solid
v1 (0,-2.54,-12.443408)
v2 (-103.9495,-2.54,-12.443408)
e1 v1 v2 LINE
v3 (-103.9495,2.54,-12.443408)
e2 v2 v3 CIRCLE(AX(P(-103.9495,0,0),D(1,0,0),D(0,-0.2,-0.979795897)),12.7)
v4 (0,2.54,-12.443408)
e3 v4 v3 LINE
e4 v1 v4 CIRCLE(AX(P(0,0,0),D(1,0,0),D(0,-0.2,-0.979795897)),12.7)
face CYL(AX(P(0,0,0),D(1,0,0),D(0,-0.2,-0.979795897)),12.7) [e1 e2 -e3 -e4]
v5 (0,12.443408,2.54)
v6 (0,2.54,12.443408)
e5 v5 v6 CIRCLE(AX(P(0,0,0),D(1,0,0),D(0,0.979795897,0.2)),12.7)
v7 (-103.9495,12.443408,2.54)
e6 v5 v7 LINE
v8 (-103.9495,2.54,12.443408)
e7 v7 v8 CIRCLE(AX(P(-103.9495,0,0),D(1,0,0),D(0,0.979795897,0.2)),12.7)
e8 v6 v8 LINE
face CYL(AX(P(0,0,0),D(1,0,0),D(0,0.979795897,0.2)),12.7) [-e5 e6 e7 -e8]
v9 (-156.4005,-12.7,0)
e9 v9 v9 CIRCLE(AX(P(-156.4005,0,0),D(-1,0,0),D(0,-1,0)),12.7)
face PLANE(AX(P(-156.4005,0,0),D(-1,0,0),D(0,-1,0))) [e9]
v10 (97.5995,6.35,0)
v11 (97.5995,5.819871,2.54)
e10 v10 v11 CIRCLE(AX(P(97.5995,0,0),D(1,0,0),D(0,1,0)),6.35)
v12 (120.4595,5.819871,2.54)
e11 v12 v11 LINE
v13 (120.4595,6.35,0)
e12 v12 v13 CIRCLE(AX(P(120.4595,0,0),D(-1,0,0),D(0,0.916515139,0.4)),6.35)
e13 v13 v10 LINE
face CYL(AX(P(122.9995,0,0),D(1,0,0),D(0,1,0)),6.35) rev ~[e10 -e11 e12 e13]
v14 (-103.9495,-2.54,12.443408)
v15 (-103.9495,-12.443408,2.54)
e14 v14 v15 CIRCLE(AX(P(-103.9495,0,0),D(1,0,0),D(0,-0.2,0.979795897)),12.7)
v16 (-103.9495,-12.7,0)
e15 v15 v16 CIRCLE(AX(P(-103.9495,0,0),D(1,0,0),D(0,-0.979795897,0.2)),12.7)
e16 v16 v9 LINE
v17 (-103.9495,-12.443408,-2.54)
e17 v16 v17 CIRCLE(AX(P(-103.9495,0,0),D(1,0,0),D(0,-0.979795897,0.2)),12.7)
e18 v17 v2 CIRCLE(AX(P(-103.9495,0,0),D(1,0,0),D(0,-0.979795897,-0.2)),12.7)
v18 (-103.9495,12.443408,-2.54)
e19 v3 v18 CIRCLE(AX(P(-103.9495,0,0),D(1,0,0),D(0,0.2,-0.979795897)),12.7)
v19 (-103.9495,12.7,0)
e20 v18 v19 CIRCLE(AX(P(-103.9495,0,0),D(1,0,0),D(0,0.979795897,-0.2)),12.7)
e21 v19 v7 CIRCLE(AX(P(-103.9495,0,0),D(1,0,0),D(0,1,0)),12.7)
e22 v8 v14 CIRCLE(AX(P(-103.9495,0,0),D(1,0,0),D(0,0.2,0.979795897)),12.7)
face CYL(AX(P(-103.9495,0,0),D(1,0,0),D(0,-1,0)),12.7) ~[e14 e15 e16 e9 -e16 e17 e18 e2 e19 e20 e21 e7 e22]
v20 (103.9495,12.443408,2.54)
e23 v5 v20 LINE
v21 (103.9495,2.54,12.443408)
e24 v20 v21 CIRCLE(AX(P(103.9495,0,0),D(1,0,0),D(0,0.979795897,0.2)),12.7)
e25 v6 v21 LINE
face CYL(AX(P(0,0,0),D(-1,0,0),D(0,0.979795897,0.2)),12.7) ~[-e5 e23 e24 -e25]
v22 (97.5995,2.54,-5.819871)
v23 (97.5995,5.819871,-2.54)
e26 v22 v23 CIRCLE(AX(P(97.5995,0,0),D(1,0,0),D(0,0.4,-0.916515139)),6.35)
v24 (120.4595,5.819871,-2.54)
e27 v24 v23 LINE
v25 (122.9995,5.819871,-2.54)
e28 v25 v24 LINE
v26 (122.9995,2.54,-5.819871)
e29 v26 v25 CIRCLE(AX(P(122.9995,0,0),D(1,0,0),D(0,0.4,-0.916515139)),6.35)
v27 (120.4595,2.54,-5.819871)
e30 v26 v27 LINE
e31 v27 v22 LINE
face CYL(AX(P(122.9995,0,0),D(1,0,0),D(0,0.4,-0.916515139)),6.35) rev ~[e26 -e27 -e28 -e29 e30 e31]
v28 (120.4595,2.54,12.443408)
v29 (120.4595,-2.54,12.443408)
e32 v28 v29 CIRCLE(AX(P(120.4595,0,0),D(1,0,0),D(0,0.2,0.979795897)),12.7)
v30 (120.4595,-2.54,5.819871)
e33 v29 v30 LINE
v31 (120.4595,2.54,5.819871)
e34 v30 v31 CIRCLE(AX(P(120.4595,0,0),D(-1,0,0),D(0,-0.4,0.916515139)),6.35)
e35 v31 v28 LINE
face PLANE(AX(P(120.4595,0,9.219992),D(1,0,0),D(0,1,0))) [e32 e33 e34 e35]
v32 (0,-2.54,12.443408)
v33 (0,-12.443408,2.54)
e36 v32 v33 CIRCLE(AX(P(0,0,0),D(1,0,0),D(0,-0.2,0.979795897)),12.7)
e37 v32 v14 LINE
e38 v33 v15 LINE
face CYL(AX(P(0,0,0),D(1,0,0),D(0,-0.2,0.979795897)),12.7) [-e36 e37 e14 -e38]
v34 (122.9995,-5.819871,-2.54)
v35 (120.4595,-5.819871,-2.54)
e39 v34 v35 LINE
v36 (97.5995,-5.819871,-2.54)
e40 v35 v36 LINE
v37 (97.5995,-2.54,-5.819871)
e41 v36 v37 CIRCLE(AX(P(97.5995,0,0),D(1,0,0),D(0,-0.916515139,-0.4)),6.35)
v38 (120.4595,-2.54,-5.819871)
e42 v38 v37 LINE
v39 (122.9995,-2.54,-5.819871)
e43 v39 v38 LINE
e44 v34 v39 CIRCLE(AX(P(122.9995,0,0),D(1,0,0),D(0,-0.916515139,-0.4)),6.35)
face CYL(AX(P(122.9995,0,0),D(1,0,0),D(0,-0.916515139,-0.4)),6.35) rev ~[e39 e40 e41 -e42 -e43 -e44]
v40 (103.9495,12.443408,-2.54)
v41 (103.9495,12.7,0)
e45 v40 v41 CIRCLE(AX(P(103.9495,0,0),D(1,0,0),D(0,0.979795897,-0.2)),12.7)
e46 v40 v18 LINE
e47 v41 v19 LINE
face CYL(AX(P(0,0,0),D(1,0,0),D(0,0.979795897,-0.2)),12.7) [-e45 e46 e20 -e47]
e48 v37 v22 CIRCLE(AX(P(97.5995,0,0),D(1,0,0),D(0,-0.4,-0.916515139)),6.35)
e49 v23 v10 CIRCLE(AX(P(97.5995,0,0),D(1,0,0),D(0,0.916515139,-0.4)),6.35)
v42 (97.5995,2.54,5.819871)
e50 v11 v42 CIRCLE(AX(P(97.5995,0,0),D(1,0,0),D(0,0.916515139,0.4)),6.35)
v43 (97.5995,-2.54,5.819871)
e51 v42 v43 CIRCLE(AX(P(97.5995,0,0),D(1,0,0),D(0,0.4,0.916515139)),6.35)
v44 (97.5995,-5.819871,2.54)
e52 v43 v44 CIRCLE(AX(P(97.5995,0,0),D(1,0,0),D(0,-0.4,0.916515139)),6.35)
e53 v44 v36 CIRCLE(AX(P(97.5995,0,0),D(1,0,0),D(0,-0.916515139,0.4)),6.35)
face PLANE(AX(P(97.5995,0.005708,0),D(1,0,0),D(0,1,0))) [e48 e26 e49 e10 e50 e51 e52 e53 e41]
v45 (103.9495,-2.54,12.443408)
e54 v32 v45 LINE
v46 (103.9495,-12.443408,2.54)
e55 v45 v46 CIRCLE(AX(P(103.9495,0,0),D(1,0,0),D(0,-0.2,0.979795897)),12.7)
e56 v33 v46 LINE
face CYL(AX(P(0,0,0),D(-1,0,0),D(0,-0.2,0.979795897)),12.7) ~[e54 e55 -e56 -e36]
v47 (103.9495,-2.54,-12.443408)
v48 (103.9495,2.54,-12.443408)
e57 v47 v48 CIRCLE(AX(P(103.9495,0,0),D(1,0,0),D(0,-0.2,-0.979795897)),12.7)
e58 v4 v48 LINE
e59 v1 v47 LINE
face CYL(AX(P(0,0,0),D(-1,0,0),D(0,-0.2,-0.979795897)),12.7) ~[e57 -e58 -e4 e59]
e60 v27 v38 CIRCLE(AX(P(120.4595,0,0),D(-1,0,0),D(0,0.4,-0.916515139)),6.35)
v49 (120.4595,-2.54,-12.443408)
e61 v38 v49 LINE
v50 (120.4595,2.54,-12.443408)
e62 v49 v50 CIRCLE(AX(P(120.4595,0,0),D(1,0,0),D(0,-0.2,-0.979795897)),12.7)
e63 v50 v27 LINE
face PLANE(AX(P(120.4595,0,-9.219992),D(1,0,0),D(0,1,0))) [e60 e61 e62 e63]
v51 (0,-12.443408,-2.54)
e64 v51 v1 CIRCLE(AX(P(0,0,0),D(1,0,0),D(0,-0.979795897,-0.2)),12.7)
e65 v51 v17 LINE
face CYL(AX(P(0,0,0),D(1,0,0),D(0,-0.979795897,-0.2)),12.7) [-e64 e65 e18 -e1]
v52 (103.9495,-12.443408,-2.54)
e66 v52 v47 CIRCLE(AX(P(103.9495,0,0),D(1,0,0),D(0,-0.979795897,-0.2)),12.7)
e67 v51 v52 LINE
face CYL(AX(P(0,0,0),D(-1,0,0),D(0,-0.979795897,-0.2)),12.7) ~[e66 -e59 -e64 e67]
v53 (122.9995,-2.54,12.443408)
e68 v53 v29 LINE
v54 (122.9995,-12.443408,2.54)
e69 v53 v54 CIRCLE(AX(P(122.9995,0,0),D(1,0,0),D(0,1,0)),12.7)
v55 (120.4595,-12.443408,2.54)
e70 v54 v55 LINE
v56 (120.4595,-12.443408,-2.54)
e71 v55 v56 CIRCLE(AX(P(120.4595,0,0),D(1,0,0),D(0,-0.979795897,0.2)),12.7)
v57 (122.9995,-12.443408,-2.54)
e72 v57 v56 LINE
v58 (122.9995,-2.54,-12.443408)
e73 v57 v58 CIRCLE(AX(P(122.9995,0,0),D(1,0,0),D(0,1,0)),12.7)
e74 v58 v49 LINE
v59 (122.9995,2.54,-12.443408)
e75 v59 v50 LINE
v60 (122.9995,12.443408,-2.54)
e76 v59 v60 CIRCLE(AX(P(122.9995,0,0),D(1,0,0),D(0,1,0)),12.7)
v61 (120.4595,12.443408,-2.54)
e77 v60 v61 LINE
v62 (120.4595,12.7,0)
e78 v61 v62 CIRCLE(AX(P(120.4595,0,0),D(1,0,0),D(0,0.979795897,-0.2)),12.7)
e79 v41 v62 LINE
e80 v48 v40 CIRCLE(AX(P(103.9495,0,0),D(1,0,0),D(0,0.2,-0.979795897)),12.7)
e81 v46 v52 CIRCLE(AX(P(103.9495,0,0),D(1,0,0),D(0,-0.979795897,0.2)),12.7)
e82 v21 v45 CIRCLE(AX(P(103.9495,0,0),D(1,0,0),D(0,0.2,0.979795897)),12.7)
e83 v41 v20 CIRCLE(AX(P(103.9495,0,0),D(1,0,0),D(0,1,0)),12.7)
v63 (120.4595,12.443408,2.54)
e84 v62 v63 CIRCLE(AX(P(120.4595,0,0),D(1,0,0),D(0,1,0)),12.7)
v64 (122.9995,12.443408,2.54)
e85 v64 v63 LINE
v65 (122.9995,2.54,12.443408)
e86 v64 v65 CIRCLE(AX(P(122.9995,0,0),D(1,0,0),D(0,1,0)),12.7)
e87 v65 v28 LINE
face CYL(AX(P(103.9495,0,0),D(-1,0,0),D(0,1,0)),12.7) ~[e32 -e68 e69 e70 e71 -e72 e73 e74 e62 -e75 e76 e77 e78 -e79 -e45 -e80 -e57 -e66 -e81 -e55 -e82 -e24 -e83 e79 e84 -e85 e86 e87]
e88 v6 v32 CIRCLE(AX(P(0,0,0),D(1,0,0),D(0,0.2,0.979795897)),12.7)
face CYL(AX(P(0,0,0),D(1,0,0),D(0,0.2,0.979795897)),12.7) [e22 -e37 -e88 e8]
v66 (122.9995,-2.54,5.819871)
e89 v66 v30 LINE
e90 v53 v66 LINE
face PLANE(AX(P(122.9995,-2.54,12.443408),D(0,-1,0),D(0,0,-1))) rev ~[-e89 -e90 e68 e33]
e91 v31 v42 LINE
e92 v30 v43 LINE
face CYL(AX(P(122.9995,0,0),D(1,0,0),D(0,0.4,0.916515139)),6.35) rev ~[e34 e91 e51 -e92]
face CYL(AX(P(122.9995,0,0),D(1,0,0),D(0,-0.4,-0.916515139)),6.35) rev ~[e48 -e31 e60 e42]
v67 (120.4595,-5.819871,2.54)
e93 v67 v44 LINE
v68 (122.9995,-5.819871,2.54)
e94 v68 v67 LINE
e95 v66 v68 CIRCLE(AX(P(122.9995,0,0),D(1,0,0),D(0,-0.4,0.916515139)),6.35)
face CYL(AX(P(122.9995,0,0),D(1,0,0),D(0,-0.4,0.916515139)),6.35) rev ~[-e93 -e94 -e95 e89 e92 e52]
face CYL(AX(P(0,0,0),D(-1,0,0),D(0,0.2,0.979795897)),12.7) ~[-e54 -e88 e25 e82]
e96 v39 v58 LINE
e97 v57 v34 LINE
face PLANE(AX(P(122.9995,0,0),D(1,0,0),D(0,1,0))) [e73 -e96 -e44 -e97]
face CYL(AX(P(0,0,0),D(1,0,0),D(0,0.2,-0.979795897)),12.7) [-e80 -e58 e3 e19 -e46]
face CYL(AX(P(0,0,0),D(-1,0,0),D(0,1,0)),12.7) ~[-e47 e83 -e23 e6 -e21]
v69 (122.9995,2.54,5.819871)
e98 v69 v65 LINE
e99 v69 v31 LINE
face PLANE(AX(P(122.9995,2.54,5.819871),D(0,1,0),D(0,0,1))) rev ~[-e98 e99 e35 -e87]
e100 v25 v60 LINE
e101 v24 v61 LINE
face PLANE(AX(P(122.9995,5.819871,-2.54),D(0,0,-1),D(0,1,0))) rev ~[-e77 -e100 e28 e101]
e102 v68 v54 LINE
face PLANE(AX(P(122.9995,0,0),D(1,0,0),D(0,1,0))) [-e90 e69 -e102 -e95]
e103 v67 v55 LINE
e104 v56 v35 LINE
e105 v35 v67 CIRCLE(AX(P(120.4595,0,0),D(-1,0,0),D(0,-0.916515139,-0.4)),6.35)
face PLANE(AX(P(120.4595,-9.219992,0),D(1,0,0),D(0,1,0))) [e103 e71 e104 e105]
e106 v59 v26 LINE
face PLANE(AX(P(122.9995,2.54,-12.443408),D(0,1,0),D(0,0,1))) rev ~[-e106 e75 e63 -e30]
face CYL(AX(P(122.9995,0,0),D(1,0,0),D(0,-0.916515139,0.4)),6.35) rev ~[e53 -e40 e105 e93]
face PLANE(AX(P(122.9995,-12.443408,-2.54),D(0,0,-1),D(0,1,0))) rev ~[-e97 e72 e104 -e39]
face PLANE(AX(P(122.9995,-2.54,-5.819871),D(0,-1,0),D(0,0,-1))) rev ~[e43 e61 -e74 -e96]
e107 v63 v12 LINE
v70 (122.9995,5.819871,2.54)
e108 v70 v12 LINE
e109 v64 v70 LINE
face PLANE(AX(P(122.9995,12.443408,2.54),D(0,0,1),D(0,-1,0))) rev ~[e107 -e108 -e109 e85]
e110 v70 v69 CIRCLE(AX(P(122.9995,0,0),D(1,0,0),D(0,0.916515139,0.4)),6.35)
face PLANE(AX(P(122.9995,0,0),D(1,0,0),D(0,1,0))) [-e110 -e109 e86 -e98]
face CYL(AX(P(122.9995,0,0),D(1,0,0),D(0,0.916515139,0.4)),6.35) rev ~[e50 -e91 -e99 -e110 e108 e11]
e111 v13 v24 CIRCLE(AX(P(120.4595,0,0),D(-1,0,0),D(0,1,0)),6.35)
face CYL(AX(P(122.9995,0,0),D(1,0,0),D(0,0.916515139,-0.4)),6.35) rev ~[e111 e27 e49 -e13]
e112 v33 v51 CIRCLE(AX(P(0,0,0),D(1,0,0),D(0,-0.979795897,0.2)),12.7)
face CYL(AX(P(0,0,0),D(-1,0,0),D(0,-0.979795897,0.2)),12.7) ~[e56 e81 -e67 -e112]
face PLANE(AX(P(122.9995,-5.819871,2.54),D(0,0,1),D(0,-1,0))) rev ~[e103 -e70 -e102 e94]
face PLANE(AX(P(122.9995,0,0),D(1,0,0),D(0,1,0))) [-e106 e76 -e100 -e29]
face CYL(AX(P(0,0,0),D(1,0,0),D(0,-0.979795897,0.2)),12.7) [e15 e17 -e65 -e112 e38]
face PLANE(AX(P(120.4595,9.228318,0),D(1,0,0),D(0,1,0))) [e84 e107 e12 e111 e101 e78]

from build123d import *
from build123d import SkipClean  # not in build123d's __all__

# Parameters (mm, degrees)
F1_DEPTH  = 103.9495
F3_R      = 12.7
F4_DEPTH  = 19.05
F6_DEPTH  = 25.4
F8_DEPTH  = 2.54
F9_R      = 12.7
F10_DEPTH = 52.451


# Not quite as in the source:
# - after a boolean that leaves OpenCascade's solid faulty, fix() repairs it


with BuildPart() as f1:
    # F0 (on Right) → F1 (new body, symmetric)
    with BuildSketch(Plane.YZ):
        with BuildLine():
            ThreePointArc((12.4434078933, -2.54), (12.6356891432, -1.2764638175), (12.7, 0))
            ThreePointArc((12.7, 0), (12.6356891432, 1.2764638175), (12.4434078933, 2.54))
            Line((12.4434078933, 2.54), (5.8198711326, 2.54))
            ThreePointArc((5.8198711326, 2.54), (6.2160550871, 1.2973662374), (6.35, 0))
            ThreePointArc((6.35, 0), (6.2160550871, -1.2973662374), (5.8198711326, -2.54))
            Line((5.8198711326, -2.54), (12.4434078933, -2.54))
        make_face()
        with BuildLine():
            Line((5.8198711326, 2.54), (12.4434078933, 2.54))
            ThreePointArc((12.4434078933, 2.54), (8.9802561211, 8.9802561211), (2.54, 12.4434078933))
            Line((2.54, 12.4434078933), (2.54, 5.8198711326))
            ThreePointArc((2.54, 5.8198711326), (4.4901280605, 4.4901280605), (5.8198711326, 2.54))
        make_face()
        with BuildLine():
            ThreePointArc((2.54, -12.4434078933), (8.9802561211, -8.9802561211), (12.4434078933, -2.54))
            Line((12.4434078933, -2.54), (5.8198711326, -2.54))
            ThreePointArc((5.8198711326, -2.54), (4.4901280605, -4.4901280605), (2.54, -5.8198711326))
            Line((2.54, -5.8198711326), (2.54, -12.4434078933))
        make_face()
        with BuildLine():
            Line((2.54, 5.8198711326), (2.54, 12.4434078933))
            ThreePointArc((2.54, 12.4434078933), (0, 12.7), (-2.54, 12.4434078933))
            Line((-2.54, 12.4434078933), (-2.54, 5.8198711326))
            ThreePointArc((-2.54, 5.8198711326), (0, 6.35), (2.54, 5.8198711326))
        make_face()
        with BuildLine():
            ThreePointArc((-2.54, -12.4434078933), (0, -12.7), (2.54, -12.4434078933))
            Line((2.54, -12.4434078933), (2.54, -5.8198711326))
            ThreePointArc((2.54, -5.8198711326), (0, -6.35), (-2.54, -5.8198711326))
            Line((-2.54, -5.8198711326), (-2.54, -12.4434078933))
        make_face()
        with BuildLine():
            Line((-2.54, 5.8198711326), (-2.54, 12.4434078933))
            ThreePointArc((-2.54, 12.4434078933), (-8.9802561211, 8.9802561211), (-12.4434078933, 2.54))
            Line((-12.4434078933, 2.54), (-5.8198711326, 2.54))
            ThreePointArc((-5.8198711326, 2.54), (-4.4901280605, 4.4901280605), (-2.54, 5.8198711326))
        make_face()
        with BuildLine():
            ThreePointArc((-12.4434078933, -2.54), (-8.9802561211, -8.9802561211), (-2.54, -12.4434078933))
            Line((-2.54, -12.4434078933), (-2.54, -5.8198711326))
            ThreePointArc((-2.54, -5.8198711326), (-4.4901280605, -4.4901280605), (-5.8198711326, -2.54))
            Line((-5.8198711326, -2.54), (-12.4434078933, -2.54))
        make_face()
        with BuildLine():
            Line((-5.8198711326, 2.54), (-12.4434078933, 2.54))
            ThreePointArc((-12.4434078933, 2.54), (-12.7, 0), (-12.4434078933, -2.54))
            Line((-12.4434078933, -2.54), (-5.8198711326, -2.54))
            ThreePointArc((-5.8198711326, -2.54), (-6.35, 0), (-5.8198711326, 2.54))
        make_face()
        with BuildLine():
            ThreePointArc((6.35, 0), (6.2160550871, 1.2973662374), (5.8198711326, 2.54))
            ThreePointArc((5.8198711326, 2.54), (4.4901280605, 4.4901280605), (2.54, 5.8198711326))
            ThreePointArc((2.54, 5.8198711326), (0, 6.35), (-2.54, 5.8198711326))
            ThreePointArc((-2.54, 5.8198711326), (-4.4901280605, 4.4901280605), (-5.8198711326, 2.54))
            ThreePointArc((-5.8198711326, 2.54), (-6.35, 0), (-5.8198711326, -2.54))
            ThreePointArc((-5.8198711326, -2.54), (-4.4901280605, -4.4901280605), (-2.54, -5.8198711326))
            ThreePointArc((-2.54, -5.8198711326), (0, -6.35), (2.54, -5.8198711326))
            ThreePointArc((2.54, -5.8198711326), (4.4901280605, -4.4901280605), (5.8198711326, -2.54))
            ThreePointArc((5.8198711326, -2.54), (6.2160550871, -1.2973662374), (6.35, 0))
        make_face()
    extrude(amount=F1_DEPTH, both=True)

    # F3 (on face) → F4 (join)
    with BuildSketch(Plane.YZ.offset(103.9495)):
        Circle(F3_R)
    with SkipClean():  # cleaning this boolean's faces spoils the solid; the shape is the same uncleaned
        extrude(amount=F4_DEPTH)

    # F5 (on face) → F6 (cut)
    with BuildSketch(Plane.YZ.offset(122.9995)):
        with BuildLine():
            ThreePointArc((5.8198711326, -2.54), (6.2160550871, -1.2973662374), (6.35, 0))
            ThreePointArc((6.35, 0), (6.2160550871, 1.2973662374), (5.8198711326, 2.54))
            ThreePointArc((5.8198711326, 2.54), (4.4901280605, 4.4901280605), (2.54, 5.8198711326))
            ThreePointArc((2.54, 5.8198711326), (0, 6.35), (-2.54, 5.8198711326))
            ThreePointArc((-2.54, 5.8198711326), (-4.4901280605, 4.4901280605), (-5.8198711326, 2.54))
            ThreePointArc((-5.8198711326, 2.54), (-6.35, 0), (-5.8198711326, -2.54))
            ThreePointArc((-5.8198711326, -2.54), (-4.4901280605, -4.4901280605), (-2.54, -5.8198711326))
            ThreePointArc((-2.54, -5.8198711326), (0, -6.35), (2.54, -5.8198711326))
            ThreePointArc((2.54, -5.8198711326), (4.4901280605, -4.4901280605), (5.8198711326, -2.54))
        make_face()
    extrude(amount=-F6_DEPTH, mode=Mode.SUBTRACT)

    add(f1.part.fix(), mode=Mode.REPLACE)

    # F7 (on face) → F8 (cut)
    with BuildSketch(Plane.YZ.offset(122.9995)):
        with BuildLine():
            ThreePointArc((2.54, 12.4434078933), (0, 12.7), (-2.54, 12.4434078933))
            Line((-2.54, 12.4434078933), (-2.54, 5.8198711326))
            ThreePointArc((-2.54, 5.8198711326), (0, 6.35), (2.54, 5.8198711326))
            Line((2.54, 5.8198711326), (2.54, 12.4434078933))
        make_face()
        with BuildLine():
            ThreePointArc((12.7, 0), (12.6356891432, 1.2764638175), (12.4434078933, 2.54))
            Line((12.4434078933, 2.54), (5.8198711326, 2.54))
            ThreePointArc((5.8198711326, 2.54), (6.2160550871, 1.2973662374), (6.35, 0))
            ThreePointArc((6.35, 0), (6.2160550871, -1.2973662374), (5.8198711326, -2.54))
            Line((5.8198711326, -2.54), (12.4434078933, -2.54))
            ThreePointArc((12.4434078933, -2.54), (12.6356891432, -1.2764638175), (12.7, 0))
        make_face()
        with BuildLine():
            Line((-2.54, -5.8198711326), (-2.54, -12.4434078933))
            ThreePointArc((-2.54, -12.4434078933), (0, -12.7), (2.54, -12.4434078933))
            Line((2.54, -12.4434078933), (2.54, -5.8198711326))
            ThreePointArc((2.54, -5.8198711326), (0, -6.35), (-2.54, -5.8198711326))
        make_face()
        with BuildLine():
            Line((-5.8198711326, 2.54), (-12.4434078933, 2.54))
            ThreePointArc((-12.4434078933, 2.54), (-12.7, 0), (-12.4434078933, -2.54))
            Line((-12.4434078933, -2.54), (-5.8198711326, -2.54))
            ThreePointArc((-5.8198711326, -2.54), (-6.35, 0), (-5.8198711326, 2.54))
        make_face()
    extrude(amount=-F8_DEPTH, mode=Mode.SUBTRACT)

    # F9 (on face) → F10 (join)
    with BuildSketch(Plane(origin=(-103.9495, 0, 0), x_dir=(0, -1, 0), z_dir=(-1, 0, 0))):
        Circle(F9_R)
    with SkipClean():  # cleaning this boolean's faces spoils the solid; the shape is the same uncleaned
        extrude(amount=F10_DEPTH)


solid = f1.part
